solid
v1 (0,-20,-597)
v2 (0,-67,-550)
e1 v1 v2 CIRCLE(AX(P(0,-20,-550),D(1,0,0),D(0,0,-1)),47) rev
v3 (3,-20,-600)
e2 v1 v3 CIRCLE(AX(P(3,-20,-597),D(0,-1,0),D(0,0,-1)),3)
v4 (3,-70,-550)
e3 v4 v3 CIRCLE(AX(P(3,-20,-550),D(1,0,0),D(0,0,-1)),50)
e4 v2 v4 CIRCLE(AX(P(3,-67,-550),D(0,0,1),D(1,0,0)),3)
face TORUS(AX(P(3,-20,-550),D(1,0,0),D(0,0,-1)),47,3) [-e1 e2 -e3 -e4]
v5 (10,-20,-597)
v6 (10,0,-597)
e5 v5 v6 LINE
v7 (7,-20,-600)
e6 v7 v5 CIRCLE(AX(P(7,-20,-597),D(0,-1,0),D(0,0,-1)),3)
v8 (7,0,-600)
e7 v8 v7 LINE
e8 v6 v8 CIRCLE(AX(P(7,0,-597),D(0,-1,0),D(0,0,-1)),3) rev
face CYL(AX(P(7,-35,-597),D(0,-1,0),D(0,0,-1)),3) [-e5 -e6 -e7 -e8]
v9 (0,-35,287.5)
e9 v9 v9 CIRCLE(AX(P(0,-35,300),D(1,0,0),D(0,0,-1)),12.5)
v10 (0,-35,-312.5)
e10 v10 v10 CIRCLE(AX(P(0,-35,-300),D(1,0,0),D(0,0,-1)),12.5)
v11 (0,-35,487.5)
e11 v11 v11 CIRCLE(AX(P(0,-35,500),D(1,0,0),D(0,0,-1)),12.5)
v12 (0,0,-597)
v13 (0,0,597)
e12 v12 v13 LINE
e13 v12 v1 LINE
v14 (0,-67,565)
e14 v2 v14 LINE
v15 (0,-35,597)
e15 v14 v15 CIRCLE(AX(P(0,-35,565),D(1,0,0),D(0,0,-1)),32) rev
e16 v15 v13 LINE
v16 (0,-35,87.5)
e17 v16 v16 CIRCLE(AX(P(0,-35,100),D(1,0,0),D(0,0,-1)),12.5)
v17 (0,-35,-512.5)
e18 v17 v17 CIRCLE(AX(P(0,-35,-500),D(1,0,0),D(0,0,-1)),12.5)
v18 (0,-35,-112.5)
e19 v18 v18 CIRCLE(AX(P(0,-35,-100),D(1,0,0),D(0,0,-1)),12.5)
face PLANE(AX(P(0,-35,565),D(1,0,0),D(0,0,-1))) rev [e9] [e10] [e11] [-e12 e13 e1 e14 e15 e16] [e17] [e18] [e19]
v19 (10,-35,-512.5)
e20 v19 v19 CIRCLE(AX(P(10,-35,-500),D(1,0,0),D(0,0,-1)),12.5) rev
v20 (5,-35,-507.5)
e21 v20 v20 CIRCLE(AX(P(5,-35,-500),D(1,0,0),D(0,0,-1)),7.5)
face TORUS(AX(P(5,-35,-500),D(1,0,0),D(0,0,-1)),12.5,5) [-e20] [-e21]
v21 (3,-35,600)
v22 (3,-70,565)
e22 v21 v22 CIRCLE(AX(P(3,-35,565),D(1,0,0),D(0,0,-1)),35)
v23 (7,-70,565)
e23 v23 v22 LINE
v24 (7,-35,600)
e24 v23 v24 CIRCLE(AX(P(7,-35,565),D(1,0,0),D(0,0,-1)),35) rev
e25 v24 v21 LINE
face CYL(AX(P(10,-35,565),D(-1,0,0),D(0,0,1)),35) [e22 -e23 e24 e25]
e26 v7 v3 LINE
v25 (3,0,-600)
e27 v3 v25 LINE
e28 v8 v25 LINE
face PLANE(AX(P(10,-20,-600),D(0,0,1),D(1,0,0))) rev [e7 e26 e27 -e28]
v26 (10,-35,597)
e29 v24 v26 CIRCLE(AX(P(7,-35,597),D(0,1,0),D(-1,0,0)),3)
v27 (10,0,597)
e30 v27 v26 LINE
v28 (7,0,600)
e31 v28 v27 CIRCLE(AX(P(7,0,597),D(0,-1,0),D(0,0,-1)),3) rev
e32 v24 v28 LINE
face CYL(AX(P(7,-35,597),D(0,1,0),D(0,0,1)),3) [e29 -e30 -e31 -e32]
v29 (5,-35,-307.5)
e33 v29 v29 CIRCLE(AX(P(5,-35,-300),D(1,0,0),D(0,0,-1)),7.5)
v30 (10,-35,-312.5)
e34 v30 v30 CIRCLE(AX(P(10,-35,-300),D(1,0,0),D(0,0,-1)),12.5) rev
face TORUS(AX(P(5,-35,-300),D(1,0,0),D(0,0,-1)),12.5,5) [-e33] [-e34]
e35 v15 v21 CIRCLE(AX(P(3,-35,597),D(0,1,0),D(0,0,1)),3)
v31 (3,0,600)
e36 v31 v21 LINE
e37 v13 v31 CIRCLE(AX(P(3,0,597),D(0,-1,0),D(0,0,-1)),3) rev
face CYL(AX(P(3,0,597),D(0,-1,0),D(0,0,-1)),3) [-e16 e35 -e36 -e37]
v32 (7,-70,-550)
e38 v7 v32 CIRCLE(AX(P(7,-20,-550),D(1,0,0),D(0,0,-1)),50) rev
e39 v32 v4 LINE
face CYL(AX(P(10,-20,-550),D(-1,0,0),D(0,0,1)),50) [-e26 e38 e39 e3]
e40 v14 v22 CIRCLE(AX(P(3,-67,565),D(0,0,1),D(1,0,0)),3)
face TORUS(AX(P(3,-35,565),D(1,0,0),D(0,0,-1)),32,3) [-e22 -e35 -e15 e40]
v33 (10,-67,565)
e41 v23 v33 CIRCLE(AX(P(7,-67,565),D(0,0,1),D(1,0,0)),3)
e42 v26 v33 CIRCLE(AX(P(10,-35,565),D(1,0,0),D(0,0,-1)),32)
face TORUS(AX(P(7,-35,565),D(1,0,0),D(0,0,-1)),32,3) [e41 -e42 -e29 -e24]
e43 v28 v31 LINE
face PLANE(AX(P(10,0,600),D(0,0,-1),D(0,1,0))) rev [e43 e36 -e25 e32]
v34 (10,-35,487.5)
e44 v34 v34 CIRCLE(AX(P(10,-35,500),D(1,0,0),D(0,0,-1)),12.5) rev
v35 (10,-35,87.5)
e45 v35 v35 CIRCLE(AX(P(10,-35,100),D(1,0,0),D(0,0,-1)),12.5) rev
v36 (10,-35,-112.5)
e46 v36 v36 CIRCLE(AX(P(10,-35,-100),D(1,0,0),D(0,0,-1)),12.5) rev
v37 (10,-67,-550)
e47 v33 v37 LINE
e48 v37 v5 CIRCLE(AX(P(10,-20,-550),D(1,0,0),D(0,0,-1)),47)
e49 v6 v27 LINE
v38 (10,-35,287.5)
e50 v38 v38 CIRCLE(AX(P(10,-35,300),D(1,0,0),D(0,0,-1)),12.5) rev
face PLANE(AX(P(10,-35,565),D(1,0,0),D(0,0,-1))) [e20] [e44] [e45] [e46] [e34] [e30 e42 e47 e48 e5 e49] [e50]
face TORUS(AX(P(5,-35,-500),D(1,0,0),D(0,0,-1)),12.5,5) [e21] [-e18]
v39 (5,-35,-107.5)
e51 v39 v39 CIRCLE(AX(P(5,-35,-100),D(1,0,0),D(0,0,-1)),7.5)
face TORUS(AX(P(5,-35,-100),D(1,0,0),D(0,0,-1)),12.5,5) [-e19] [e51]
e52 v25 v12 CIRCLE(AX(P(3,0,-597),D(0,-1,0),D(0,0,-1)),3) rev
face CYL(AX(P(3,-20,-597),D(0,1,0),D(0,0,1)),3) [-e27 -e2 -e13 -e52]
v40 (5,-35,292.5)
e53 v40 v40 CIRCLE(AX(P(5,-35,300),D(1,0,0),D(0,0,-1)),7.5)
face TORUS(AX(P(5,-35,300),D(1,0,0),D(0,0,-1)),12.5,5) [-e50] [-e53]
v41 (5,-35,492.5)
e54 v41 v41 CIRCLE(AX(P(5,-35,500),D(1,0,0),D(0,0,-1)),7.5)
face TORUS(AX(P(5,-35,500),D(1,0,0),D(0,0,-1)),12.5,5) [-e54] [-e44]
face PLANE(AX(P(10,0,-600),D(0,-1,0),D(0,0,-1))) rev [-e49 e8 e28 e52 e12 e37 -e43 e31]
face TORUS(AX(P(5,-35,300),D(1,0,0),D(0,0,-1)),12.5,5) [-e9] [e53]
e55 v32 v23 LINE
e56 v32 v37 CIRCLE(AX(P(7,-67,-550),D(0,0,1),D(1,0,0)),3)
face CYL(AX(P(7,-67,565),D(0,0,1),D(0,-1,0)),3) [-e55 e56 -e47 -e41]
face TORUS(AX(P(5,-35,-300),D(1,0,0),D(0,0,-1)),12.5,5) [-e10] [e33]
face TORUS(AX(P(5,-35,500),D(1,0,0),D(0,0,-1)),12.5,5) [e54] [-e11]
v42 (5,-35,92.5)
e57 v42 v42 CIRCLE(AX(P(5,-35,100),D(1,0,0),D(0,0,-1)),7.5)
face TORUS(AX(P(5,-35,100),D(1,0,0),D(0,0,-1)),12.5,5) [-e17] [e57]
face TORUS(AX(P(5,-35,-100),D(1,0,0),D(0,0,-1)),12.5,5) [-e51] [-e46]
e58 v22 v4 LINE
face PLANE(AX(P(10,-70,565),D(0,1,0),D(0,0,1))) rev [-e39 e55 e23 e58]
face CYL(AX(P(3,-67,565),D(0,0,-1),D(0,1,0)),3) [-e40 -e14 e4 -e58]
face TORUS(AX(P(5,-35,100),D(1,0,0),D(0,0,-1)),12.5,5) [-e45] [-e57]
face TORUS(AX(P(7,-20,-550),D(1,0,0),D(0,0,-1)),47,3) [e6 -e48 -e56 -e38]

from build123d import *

# Parameters (mm, degrees)
SKETCH1_R           = 7.5
BOSS_EXTRUDE1_DEPTH = 10
FILLET1_R           = 3
FILLET2_R           = 5


with BuildPart() as part:
    # Sketch1 → Boss-Extrude1 (new body)
    with BuildSketch(Plane(origin=(0, 0, 0), x_dir=(0, 0, -1), z_dir=(1, 0, 0))):
        with BuildLine():
            Line((-600, 0), (-600, -35))
            ThreePointArc((-600, -35), (-589.748737342, -59.748737342), (-565, -70))
            Line((-565, -70), (550, -70))
            ThreePointArc((550, -70), (585.355339059, -55.355339059), (600, -20))
            Line((600, -20), (600, 0))
            Line((600, 0), (-600, 0))
        make_face()
        with Locations((-500, -35)):
            Circle(SKETCH1_R, mode=Mode.SUBTRACT)
        with Locations((-300, -35)):
            Circle(SKETCH1_R, mode=Mode.SUBTRACT)
        with Locations((-100, -35)):
            Circle(SKETCH1_R, mode=Mode.SUBTRACT)
        with Locations((100, -35)):
            Circle(SKETCH1_R, mode=Mode.SUBTRACT)
        with Locations((300, -35)):
            Circle(SKETCH1_R, mode=Mode.SUBTRACT)
        with Locations((500, -35)):
            Circle(SKETCH1_R, mode=Mode.SUBTRACT)
    extrude(amount=BOSS_EXTRUDE1_DEPTH)

    # Fillet1
    fillet1_edges = [part.edges().sort_by_distance(p)[0] for p in [
        (10, -59.748737342, 589.748737342),
        (10, -70, 7.5),
        (10, -55.355339059, -585.355339059),
        (10, -10, -600),
        (0, -10, -600),
        (0, -55.355339059, -585.355339059),
        (0, -70, 7.5),
        (0, -59.748737342, 589.748737342),
        (0, -17.5, 600),
        (10, -17.5, 600),
    ]]
    fillet(fillet1_edges, radius=FILLET1_R)

    # Fillet2
    fillet2_edges = [part.edges().sort_by_distance(p)[0] for p in [
        (0, -35, 507.5),
        (10, -35, 507.5),
        (0, -35, 307.5),
        (10, -35, 307.5),
        (0, -35, 107.5),
        (10, -35, 107.5),
        (0, -35, -92.5),
        (10, -35, -92.5),
        (0, -35, -292.5),
        (10, -35, -292.5),
        (0, -35, -492.5),
        (10, -35, -492.5),
    ]]
    fillet(fillet2_edges, radius=FILLET2_R - 0.0001)  # a hair under: the kernel refuses the full size


solid = part.part
